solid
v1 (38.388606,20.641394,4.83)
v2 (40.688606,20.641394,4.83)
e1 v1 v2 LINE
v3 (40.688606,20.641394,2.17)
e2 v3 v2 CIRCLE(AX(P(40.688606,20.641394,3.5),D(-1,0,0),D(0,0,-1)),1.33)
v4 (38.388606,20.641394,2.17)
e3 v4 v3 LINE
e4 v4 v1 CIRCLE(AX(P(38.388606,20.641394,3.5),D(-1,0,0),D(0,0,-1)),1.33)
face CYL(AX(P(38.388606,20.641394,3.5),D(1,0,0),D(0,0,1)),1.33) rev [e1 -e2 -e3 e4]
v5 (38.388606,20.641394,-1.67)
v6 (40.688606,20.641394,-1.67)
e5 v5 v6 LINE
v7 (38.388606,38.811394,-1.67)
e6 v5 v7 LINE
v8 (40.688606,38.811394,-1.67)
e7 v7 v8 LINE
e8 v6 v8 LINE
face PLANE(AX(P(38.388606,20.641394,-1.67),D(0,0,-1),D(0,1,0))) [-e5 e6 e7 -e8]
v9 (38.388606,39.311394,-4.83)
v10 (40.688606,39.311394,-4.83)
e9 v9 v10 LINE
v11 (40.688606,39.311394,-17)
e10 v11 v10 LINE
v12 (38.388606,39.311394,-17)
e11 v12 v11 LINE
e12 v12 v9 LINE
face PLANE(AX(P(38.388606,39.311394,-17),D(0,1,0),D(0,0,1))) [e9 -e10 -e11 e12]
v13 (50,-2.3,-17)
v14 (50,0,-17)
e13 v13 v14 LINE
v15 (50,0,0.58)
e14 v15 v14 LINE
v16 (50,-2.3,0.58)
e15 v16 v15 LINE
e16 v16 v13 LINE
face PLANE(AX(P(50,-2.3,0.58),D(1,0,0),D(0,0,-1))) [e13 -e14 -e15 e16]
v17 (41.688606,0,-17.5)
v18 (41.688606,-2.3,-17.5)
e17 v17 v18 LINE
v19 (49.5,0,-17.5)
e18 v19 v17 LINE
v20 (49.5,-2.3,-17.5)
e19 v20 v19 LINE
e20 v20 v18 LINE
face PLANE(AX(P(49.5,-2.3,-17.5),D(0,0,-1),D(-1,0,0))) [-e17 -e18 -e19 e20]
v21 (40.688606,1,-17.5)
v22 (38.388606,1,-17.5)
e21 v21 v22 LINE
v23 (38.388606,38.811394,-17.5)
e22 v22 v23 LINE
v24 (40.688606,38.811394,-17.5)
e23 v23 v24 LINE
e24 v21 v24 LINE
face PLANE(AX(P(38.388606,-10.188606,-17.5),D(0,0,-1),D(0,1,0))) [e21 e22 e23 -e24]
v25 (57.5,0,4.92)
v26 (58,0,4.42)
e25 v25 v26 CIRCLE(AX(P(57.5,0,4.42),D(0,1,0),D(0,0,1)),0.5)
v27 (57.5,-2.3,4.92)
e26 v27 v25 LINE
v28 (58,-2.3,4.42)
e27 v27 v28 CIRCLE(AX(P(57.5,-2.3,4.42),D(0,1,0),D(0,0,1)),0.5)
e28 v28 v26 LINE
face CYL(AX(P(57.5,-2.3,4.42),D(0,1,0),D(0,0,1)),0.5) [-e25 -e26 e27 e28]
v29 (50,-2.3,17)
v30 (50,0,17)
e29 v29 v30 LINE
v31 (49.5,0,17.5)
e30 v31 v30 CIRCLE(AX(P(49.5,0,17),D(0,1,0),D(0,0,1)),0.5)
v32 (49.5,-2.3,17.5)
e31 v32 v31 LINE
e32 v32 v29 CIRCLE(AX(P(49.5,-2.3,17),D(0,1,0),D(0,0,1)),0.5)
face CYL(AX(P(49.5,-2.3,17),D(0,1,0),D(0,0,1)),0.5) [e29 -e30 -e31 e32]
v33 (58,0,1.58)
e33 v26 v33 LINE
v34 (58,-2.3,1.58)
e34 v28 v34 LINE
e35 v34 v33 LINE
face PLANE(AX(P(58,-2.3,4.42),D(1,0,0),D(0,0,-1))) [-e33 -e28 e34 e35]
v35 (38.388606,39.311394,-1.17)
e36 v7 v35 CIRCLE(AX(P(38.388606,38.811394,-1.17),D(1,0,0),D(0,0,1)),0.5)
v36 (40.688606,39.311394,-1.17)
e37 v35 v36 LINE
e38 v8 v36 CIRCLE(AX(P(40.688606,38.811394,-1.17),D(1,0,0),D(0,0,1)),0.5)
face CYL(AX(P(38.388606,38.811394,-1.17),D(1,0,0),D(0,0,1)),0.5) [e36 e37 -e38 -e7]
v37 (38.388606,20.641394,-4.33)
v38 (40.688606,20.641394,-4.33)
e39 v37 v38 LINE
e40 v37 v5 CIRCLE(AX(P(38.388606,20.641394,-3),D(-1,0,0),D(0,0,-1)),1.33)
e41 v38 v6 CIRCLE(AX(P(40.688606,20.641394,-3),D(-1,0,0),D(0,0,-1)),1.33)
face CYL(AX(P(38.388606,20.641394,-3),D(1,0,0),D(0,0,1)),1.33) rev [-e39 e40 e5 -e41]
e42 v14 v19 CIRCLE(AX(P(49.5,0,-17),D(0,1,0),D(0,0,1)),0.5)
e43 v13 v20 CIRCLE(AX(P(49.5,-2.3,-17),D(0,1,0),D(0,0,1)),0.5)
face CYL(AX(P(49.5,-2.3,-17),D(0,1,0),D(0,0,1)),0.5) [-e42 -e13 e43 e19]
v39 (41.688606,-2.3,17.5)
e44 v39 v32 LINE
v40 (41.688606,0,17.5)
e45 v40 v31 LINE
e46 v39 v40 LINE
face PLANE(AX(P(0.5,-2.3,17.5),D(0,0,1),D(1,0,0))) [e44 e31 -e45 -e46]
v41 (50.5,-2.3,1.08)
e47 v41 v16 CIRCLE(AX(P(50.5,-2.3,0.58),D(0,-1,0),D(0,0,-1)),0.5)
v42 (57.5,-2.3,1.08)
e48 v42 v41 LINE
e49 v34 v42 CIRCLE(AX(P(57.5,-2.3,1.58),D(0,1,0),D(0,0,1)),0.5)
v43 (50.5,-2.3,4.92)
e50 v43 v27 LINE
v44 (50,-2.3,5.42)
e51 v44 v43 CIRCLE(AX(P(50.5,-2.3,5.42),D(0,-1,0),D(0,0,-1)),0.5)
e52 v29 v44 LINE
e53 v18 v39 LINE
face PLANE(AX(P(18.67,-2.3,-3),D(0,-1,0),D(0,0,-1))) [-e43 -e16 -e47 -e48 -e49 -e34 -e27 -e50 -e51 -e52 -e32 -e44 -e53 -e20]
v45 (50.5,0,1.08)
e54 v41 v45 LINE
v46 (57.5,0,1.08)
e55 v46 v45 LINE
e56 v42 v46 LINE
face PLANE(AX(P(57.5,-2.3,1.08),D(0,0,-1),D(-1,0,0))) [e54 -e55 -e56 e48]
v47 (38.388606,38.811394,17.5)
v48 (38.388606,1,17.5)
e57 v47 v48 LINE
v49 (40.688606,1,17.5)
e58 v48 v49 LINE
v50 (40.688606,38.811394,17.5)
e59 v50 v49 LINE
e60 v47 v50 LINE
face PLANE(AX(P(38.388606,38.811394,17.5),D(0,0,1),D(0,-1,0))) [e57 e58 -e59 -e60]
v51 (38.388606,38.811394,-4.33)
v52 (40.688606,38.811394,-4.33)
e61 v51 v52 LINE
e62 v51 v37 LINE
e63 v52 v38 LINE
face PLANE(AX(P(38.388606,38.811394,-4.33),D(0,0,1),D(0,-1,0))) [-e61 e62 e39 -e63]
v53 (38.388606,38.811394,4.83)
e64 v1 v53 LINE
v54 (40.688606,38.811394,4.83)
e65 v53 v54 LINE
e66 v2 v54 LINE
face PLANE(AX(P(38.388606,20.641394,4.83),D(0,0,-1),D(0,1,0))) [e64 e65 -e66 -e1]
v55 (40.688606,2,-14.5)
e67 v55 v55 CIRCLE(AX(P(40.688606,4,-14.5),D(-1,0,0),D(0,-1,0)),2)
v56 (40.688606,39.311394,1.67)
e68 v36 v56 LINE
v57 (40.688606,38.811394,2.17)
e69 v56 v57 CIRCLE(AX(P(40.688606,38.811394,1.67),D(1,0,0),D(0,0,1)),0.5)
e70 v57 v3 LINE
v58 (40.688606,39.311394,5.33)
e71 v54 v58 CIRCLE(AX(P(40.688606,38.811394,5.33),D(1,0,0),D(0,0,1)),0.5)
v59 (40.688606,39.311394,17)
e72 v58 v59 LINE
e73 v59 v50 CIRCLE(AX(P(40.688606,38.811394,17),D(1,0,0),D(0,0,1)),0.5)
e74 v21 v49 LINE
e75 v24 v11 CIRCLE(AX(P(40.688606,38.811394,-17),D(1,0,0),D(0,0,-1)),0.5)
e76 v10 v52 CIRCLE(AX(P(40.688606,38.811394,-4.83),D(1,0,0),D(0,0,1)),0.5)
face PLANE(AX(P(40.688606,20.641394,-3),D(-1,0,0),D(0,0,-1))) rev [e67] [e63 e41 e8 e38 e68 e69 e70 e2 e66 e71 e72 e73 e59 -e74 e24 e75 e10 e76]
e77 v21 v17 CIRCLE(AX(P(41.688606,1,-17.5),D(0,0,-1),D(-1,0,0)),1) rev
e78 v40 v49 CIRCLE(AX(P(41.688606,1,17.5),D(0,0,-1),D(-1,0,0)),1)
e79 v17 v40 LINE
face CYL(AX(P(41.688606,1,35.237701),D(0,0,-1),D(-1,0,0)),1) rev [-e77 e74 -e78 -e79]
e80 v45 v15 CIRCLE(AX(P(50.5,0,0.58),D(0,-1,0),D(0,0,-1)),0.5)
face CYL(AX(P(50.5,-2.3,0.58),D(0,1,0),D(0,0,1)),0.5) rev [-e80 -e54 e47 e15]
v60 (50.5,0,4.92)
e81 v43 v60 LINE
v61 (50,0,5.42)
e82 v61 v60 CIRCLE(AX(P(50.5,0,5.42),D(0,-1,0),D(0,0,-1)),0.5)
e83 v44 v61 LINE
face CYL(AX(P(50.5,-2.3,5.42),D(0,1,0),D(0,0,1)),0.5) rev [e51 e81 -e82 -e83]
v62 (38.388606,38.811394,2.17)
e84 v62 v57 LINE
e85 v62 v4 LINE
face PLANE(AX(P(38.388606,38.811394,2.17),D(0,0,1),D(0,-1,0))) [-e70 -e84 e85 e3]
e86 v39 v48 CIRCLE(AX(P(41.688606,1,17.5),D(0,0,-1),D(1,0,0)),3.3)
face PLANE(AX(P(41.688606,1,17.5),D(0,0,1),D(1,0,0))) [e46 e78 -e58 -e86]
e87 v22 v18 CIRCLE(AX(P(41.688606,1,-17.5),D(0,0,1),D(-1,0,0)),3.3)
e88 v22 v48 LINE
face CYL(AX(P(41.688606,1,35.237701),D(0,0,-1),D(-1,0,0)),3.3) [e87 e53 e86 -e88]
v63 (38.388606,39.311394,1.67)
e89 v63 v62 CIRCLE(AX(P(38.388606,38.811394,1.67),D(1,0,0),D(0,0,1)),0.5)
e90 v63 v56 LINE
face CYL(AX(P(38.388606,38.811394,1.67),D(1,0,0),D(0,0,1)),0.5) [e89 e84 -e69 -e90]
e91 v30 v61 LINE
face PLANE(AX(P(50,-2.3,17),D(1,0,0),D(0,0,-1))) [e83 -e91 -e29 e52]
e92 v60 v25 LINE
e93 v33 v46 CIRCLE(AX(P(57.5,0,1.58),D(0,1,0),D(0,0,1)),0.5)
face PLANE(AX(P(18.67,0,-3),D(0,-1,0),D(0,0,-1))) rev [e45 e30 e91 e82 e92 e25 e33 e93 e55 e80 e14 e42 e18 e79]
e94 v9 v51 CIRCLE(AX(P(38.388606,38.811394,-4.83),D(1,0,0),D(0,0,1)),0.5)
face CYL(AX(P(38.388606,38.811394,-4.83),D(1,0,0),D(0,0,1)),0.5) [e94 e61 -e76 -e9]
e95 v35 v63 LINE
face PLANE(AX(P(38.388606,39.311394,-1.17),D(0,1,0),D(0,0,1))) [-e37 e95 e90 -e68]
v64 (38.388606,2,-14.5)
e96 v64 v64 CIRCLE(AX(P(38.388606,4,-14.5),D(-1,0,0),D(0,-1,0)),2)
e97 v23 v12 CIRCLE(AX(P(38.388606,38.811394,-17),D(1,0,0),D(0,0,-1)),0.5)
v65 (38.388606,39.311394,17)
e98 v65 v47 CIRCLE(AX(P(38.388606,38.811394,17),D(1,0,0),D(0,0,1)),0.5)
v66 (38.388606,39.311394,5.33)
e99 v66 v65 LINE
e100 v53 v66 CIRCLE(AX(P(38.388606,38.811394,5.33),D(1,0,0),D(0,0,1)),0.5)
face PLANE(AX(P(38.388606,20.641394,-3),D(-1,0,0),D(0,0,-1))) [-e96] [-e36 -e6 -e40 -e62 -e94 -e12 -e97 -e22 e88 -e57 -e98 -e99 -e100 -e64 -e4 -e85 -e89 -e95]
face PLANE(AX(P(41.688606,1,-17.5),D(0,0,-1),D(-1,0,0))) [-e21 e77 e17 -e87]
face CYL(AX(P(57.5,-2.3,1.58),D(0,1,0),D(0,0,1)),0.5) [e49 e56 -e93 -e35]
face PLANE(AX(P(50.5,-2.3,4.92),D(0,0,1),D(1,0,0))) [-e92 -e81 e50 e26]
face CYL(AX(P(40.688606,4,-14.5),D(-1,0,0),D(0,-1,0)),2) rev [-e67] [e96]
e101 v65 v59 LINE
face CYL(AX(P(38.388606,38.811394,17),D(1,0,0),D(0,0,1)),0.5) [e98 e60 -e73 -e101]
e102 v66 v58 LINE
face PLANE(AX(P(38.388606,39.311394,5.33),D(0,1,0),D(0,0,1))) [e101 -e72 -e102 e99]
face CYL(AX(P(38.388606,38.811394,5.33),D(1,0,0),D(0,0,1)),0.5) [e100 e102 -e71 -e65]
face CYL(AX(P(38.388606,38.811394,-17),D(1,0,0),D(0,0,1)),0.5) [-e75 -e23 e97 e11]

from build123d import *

# Parameters (mm, degrees)
BASE_FLANGE1_DEPTH       = 2.3
SKETCHED_BEND1_OUTLINE_W = 2.3
SKETCHED_BEND1_OUTLINE_H = 35
SKETCHED_BEND1_DEPTH     = 38.388606051
SKETCHED_START           = 38.709564051
SKETCHED_BEND1_2_DEPTH   = 1.979042
SKETCHED_START_2         = 38.388606051
SKETCHED_BEND1_3_DEPTH   = 3.3
SKETCHED_START_3         = -17.5
SKETCHED_BEND1_4_DEPTH   = 35
SKETCH7_R                = 2
CUT_EXTRUDE1_DEPTH       = 10


with BuildPart() as part:
    # Base-Flange1: sheet metal written as solids
    # Sketch1 → Base-Flange1 (new body)
    with BuildSketch(Plane(origin=(0, 0, 0), x_dir=(1, 0, 0), z_dir=(0, 1, 0))):
        with BuildLine():
            Line((0, 17), (0, 4.83))
            ThreePointArc((0, 4.83), (0.146446609, 4.476446609), (0.5, 4.33))
            Line((0.5, 4.33), (18.67, 4.33))
            ThreePointArc((18.67, 4.33), (20, 3), (18.67, 1.67))
            Line((18.67, 1.67), (0.5, 1.67))
            ThreePointArc((0.5, 1.67), (0.146446609, 1.523553391), (0, 1.17))
            Line((0, 1.17), (0, -1.67))
            ThreePointArc((0, -1.67), (0.146446609, -2.023553391), (0.5, -2.17))
            Line((0.5, -2.17), (18.67, -2.17))
            ThreePointArc((18.67, -2.17), (20, -3.5), (18.67, -4.83))
            Line((18.67, -4.83), (0.5, -4.83))
            ThreePointArc((0.5, -4.83), (0.146446609, -4.976446609), (0, -5.33))
            Line((0, -5.33), (0, -17))
            ThreePointArc((0, -17), (0.146446609, -17.353553391), (0.5, -17.5))
            Line((0.5, -17.5), (49.5, -17.5))
            ThreePointArc((49.5, -17.5), (49.853553391, -17.353553391), (50, -17))
            Line((50, -17), (50, -5.42))
            ThreePointArc((50, -5.42), (50.146446609, -5.066446609), (50.5, -4.92))
            Line((50.5, -4.92), (57.5, -4.92))
            ThreePointArc((57.5, -4.92), (57.853553391, -4.773553391), (58, -4.42))
            Line((58, -4.42), (58, -1.58))
            ThreePointArc((58, -1.58), (57.853553391, -1.226446609), (57.5, -1.08))
            Line((57.5, -1.08), (50.5, -1.08))
            ThreePointArc((50.5, -1.08), (50.146446609, -0.933553391), (50, -0.58))
            Line((50, -0.58), (50, 17))
            ThreePointArc((50, 17), (49.853553391, 17.353553391), (49.5, 17.5))
            Line((49.5, 17.5), (0.5, 17.5))
            ThreePointArc((0.5, 17.5), (0.146446609, 17.353553391), (0, 17))
        make_face()
    extrude(amount=-BASE_FLANGE1_DEPTH)

    # Sketched Bend1: read off the stored shape, not the designer's step
    # Sketched Bend1 outline → Sketched Bend1 (cut)
    with BuildSketch(Plane.YZ):
        with Locations((-1.15, 0)):
            Rectangle(SKETCHED_BEND1_OUTLINE_W, SKETCHED_BEND1_OUTLINE_H)
    extrude(amount=SKETCHED_BEND1_DEPTH, mode=Mode.SUBTRACT)

    # Sketched Bend1 2 outline → Sketched Bend1 2 (add)
    with BuildSketch(Plane.YZ.offset(SKETCHED_START)):
        with BuildLine():
            Line((0, -17.5), (38.811393949, -17.5))
            ThreePointArc((38.811393949, -17.5), (39.164947339, -17.353553391), (39.311393949, -17))
            Line((39.311393949, -17), (39.311393949, -4.83))
            ThreePointArc((39.311393949, -4.83), (39.16494734, -4.476446609), (38.811393949, -4.33))
            Line((38.811393949, -4.33), (20.641393949, -4.33))
            ThreePointArc((20.641393949, -4.33), (19.311393949, -3), (20.641393949, -1.67))
            Line((20.641393949, -1.67), (38.811393949, -1.67))
            ThreePointArc((38.811393949, -1.67), (39.16494734, -1.523553391), (39.311393949, -1.17))
            Line((39.311393949, -1.17), (39.311393949, 1.67))
            ThreePointArc((39.311393949, 1.67), (39.16494734, 2.023553391), (38.811393949, 2.17))
            Line((38.811393949, 2.17), (20.641393949, 2.17))
            ThreePointArc((20.641393949, 2.17), (19.311393949, 3.5), (20.641393949, 4.83))
            Line((20.641393949, 4.83), (38.811393949, 4.83))
            ThreePointArc((38.811393949, 4.83), (39.16494734, 4.976446609), (39.311393949, 5.33))
            Line((39.311393949, 5.33), (39.311393949, 17))
            ThreePointArc((39.311393949, 17), (39.164947339, 17.353553391), (38.811393949, 17.5))
            Line((38.811393949, 17.5), (0, 17.5))
            Line((0, 17.5), (0, -17.5))
        make_face()
    extrude(amount=SKETCHED_BEND1_2_DEPTH)

    # Sketched Bend1 3 outline → Sketched Bend1 3 (add)
    with BuildSketch(Plane.YZ.offset(SKETCHED_START_2)):
        with BuildLine():
            Line((0, -17.5), (38.811393949, -17.5))
            ThreePointArc((38.811393949, -17.5), (39.164947339, -17.353553391), (39.311393949, -17))
            Line((39.311393949, -17), (39.311393949, -4.83))
            ThreePointArc((39.311393949, -4.83), (39.16494734, -4.476446609), (38.811393949, -4.33))
            Line((38.811393949, -4.33), (20.641393949, -4.33))
            ThreePointArc((20.641393949, -4.33), (19.311393949, -3), (20.641393949, -1.67))
            Line((20.641393949, -1.67), (38.811393949, -1.67))
            ThreePointArc((38.811393949, -1.67), (39.16494734, -1.523553391), (39.311393949, -1.17))
            Line((39.311393949, -1.17), (39.311393949, 1.67))
            ThreePointArc((39.311393949, 1.67), (39.16494734, 2.023553391), (38.811393949, 2.17))
            Line((38.811393949, 2.17), (20.641393949, 2.17))
            ThreePointArc((20.641393949, 2.17), (19.311393949, 3.5), (20.641393949, 4.83))
            Line((20.641393949, 4.83), (38.811393949, 4.83))
            ThreePointArc((38.811393949, 4.83), (39.16494734, 4.976446609), (39.311393949, 5.33))
            Line((39.311393949, 5.33), (39.311393949, 17))
            ThreePointArc((39.311393949, 17), (39.164947339, 17.353553391), (38.811393949, 17.5))
            Line((38.811393949, 17.5), (0, 17.5))
            Line((0, 17.5), (0, -17.5))
        make_face()
    extrude(amount=SKETCHED_BEND1_3_DEPTH)

    # Sketched Bend1 4 outline → Sketched Bend1 4 (cut)
    with BuildSketch(Plane.XY.offset(SKETCHED_START_3)):
        with BuildLine():
            Line((41.688606051, 39.311393949), (40.688606051, 39.311393949))
            Line((40.688606051, 39.311393949), (40.688606051, 1))
            ThreePointArc((40.688606051, 1), (40.98149927, 0.292893219), (41.688606051, 0))
            Line((41.688606051, 0), (41.688606051, 39.311393949))
        make_face()
        with BuildLine():
            ThreePointArc((41.688606051, -2.3), (39.355153673, -1.333452378), (38.388606051, 1))
            Line((38.388606051, 1), (38.388606051, -2.3))
            Line((38.388606051, -2.3), (41.688606051, -2.3))
        make_face()
    extrude(amount=SKETCHED_BEND1_4_DEPTH, mode=Mode.SUBTRACT)

    # Sketch7 → Cut-Extrude1 (cut)
    with BuildSketch(Plane.ZY.offset(-38.388606051)):
        with Locations(Location((-14.5, 4, 0), (0, 0, 270))):
            Circle(SKETCH7_R)
    extrude(amount=-CUT_EXTRUDE1_DEPTH, mode=Mode.SUBTRACT)


solid = part.part
